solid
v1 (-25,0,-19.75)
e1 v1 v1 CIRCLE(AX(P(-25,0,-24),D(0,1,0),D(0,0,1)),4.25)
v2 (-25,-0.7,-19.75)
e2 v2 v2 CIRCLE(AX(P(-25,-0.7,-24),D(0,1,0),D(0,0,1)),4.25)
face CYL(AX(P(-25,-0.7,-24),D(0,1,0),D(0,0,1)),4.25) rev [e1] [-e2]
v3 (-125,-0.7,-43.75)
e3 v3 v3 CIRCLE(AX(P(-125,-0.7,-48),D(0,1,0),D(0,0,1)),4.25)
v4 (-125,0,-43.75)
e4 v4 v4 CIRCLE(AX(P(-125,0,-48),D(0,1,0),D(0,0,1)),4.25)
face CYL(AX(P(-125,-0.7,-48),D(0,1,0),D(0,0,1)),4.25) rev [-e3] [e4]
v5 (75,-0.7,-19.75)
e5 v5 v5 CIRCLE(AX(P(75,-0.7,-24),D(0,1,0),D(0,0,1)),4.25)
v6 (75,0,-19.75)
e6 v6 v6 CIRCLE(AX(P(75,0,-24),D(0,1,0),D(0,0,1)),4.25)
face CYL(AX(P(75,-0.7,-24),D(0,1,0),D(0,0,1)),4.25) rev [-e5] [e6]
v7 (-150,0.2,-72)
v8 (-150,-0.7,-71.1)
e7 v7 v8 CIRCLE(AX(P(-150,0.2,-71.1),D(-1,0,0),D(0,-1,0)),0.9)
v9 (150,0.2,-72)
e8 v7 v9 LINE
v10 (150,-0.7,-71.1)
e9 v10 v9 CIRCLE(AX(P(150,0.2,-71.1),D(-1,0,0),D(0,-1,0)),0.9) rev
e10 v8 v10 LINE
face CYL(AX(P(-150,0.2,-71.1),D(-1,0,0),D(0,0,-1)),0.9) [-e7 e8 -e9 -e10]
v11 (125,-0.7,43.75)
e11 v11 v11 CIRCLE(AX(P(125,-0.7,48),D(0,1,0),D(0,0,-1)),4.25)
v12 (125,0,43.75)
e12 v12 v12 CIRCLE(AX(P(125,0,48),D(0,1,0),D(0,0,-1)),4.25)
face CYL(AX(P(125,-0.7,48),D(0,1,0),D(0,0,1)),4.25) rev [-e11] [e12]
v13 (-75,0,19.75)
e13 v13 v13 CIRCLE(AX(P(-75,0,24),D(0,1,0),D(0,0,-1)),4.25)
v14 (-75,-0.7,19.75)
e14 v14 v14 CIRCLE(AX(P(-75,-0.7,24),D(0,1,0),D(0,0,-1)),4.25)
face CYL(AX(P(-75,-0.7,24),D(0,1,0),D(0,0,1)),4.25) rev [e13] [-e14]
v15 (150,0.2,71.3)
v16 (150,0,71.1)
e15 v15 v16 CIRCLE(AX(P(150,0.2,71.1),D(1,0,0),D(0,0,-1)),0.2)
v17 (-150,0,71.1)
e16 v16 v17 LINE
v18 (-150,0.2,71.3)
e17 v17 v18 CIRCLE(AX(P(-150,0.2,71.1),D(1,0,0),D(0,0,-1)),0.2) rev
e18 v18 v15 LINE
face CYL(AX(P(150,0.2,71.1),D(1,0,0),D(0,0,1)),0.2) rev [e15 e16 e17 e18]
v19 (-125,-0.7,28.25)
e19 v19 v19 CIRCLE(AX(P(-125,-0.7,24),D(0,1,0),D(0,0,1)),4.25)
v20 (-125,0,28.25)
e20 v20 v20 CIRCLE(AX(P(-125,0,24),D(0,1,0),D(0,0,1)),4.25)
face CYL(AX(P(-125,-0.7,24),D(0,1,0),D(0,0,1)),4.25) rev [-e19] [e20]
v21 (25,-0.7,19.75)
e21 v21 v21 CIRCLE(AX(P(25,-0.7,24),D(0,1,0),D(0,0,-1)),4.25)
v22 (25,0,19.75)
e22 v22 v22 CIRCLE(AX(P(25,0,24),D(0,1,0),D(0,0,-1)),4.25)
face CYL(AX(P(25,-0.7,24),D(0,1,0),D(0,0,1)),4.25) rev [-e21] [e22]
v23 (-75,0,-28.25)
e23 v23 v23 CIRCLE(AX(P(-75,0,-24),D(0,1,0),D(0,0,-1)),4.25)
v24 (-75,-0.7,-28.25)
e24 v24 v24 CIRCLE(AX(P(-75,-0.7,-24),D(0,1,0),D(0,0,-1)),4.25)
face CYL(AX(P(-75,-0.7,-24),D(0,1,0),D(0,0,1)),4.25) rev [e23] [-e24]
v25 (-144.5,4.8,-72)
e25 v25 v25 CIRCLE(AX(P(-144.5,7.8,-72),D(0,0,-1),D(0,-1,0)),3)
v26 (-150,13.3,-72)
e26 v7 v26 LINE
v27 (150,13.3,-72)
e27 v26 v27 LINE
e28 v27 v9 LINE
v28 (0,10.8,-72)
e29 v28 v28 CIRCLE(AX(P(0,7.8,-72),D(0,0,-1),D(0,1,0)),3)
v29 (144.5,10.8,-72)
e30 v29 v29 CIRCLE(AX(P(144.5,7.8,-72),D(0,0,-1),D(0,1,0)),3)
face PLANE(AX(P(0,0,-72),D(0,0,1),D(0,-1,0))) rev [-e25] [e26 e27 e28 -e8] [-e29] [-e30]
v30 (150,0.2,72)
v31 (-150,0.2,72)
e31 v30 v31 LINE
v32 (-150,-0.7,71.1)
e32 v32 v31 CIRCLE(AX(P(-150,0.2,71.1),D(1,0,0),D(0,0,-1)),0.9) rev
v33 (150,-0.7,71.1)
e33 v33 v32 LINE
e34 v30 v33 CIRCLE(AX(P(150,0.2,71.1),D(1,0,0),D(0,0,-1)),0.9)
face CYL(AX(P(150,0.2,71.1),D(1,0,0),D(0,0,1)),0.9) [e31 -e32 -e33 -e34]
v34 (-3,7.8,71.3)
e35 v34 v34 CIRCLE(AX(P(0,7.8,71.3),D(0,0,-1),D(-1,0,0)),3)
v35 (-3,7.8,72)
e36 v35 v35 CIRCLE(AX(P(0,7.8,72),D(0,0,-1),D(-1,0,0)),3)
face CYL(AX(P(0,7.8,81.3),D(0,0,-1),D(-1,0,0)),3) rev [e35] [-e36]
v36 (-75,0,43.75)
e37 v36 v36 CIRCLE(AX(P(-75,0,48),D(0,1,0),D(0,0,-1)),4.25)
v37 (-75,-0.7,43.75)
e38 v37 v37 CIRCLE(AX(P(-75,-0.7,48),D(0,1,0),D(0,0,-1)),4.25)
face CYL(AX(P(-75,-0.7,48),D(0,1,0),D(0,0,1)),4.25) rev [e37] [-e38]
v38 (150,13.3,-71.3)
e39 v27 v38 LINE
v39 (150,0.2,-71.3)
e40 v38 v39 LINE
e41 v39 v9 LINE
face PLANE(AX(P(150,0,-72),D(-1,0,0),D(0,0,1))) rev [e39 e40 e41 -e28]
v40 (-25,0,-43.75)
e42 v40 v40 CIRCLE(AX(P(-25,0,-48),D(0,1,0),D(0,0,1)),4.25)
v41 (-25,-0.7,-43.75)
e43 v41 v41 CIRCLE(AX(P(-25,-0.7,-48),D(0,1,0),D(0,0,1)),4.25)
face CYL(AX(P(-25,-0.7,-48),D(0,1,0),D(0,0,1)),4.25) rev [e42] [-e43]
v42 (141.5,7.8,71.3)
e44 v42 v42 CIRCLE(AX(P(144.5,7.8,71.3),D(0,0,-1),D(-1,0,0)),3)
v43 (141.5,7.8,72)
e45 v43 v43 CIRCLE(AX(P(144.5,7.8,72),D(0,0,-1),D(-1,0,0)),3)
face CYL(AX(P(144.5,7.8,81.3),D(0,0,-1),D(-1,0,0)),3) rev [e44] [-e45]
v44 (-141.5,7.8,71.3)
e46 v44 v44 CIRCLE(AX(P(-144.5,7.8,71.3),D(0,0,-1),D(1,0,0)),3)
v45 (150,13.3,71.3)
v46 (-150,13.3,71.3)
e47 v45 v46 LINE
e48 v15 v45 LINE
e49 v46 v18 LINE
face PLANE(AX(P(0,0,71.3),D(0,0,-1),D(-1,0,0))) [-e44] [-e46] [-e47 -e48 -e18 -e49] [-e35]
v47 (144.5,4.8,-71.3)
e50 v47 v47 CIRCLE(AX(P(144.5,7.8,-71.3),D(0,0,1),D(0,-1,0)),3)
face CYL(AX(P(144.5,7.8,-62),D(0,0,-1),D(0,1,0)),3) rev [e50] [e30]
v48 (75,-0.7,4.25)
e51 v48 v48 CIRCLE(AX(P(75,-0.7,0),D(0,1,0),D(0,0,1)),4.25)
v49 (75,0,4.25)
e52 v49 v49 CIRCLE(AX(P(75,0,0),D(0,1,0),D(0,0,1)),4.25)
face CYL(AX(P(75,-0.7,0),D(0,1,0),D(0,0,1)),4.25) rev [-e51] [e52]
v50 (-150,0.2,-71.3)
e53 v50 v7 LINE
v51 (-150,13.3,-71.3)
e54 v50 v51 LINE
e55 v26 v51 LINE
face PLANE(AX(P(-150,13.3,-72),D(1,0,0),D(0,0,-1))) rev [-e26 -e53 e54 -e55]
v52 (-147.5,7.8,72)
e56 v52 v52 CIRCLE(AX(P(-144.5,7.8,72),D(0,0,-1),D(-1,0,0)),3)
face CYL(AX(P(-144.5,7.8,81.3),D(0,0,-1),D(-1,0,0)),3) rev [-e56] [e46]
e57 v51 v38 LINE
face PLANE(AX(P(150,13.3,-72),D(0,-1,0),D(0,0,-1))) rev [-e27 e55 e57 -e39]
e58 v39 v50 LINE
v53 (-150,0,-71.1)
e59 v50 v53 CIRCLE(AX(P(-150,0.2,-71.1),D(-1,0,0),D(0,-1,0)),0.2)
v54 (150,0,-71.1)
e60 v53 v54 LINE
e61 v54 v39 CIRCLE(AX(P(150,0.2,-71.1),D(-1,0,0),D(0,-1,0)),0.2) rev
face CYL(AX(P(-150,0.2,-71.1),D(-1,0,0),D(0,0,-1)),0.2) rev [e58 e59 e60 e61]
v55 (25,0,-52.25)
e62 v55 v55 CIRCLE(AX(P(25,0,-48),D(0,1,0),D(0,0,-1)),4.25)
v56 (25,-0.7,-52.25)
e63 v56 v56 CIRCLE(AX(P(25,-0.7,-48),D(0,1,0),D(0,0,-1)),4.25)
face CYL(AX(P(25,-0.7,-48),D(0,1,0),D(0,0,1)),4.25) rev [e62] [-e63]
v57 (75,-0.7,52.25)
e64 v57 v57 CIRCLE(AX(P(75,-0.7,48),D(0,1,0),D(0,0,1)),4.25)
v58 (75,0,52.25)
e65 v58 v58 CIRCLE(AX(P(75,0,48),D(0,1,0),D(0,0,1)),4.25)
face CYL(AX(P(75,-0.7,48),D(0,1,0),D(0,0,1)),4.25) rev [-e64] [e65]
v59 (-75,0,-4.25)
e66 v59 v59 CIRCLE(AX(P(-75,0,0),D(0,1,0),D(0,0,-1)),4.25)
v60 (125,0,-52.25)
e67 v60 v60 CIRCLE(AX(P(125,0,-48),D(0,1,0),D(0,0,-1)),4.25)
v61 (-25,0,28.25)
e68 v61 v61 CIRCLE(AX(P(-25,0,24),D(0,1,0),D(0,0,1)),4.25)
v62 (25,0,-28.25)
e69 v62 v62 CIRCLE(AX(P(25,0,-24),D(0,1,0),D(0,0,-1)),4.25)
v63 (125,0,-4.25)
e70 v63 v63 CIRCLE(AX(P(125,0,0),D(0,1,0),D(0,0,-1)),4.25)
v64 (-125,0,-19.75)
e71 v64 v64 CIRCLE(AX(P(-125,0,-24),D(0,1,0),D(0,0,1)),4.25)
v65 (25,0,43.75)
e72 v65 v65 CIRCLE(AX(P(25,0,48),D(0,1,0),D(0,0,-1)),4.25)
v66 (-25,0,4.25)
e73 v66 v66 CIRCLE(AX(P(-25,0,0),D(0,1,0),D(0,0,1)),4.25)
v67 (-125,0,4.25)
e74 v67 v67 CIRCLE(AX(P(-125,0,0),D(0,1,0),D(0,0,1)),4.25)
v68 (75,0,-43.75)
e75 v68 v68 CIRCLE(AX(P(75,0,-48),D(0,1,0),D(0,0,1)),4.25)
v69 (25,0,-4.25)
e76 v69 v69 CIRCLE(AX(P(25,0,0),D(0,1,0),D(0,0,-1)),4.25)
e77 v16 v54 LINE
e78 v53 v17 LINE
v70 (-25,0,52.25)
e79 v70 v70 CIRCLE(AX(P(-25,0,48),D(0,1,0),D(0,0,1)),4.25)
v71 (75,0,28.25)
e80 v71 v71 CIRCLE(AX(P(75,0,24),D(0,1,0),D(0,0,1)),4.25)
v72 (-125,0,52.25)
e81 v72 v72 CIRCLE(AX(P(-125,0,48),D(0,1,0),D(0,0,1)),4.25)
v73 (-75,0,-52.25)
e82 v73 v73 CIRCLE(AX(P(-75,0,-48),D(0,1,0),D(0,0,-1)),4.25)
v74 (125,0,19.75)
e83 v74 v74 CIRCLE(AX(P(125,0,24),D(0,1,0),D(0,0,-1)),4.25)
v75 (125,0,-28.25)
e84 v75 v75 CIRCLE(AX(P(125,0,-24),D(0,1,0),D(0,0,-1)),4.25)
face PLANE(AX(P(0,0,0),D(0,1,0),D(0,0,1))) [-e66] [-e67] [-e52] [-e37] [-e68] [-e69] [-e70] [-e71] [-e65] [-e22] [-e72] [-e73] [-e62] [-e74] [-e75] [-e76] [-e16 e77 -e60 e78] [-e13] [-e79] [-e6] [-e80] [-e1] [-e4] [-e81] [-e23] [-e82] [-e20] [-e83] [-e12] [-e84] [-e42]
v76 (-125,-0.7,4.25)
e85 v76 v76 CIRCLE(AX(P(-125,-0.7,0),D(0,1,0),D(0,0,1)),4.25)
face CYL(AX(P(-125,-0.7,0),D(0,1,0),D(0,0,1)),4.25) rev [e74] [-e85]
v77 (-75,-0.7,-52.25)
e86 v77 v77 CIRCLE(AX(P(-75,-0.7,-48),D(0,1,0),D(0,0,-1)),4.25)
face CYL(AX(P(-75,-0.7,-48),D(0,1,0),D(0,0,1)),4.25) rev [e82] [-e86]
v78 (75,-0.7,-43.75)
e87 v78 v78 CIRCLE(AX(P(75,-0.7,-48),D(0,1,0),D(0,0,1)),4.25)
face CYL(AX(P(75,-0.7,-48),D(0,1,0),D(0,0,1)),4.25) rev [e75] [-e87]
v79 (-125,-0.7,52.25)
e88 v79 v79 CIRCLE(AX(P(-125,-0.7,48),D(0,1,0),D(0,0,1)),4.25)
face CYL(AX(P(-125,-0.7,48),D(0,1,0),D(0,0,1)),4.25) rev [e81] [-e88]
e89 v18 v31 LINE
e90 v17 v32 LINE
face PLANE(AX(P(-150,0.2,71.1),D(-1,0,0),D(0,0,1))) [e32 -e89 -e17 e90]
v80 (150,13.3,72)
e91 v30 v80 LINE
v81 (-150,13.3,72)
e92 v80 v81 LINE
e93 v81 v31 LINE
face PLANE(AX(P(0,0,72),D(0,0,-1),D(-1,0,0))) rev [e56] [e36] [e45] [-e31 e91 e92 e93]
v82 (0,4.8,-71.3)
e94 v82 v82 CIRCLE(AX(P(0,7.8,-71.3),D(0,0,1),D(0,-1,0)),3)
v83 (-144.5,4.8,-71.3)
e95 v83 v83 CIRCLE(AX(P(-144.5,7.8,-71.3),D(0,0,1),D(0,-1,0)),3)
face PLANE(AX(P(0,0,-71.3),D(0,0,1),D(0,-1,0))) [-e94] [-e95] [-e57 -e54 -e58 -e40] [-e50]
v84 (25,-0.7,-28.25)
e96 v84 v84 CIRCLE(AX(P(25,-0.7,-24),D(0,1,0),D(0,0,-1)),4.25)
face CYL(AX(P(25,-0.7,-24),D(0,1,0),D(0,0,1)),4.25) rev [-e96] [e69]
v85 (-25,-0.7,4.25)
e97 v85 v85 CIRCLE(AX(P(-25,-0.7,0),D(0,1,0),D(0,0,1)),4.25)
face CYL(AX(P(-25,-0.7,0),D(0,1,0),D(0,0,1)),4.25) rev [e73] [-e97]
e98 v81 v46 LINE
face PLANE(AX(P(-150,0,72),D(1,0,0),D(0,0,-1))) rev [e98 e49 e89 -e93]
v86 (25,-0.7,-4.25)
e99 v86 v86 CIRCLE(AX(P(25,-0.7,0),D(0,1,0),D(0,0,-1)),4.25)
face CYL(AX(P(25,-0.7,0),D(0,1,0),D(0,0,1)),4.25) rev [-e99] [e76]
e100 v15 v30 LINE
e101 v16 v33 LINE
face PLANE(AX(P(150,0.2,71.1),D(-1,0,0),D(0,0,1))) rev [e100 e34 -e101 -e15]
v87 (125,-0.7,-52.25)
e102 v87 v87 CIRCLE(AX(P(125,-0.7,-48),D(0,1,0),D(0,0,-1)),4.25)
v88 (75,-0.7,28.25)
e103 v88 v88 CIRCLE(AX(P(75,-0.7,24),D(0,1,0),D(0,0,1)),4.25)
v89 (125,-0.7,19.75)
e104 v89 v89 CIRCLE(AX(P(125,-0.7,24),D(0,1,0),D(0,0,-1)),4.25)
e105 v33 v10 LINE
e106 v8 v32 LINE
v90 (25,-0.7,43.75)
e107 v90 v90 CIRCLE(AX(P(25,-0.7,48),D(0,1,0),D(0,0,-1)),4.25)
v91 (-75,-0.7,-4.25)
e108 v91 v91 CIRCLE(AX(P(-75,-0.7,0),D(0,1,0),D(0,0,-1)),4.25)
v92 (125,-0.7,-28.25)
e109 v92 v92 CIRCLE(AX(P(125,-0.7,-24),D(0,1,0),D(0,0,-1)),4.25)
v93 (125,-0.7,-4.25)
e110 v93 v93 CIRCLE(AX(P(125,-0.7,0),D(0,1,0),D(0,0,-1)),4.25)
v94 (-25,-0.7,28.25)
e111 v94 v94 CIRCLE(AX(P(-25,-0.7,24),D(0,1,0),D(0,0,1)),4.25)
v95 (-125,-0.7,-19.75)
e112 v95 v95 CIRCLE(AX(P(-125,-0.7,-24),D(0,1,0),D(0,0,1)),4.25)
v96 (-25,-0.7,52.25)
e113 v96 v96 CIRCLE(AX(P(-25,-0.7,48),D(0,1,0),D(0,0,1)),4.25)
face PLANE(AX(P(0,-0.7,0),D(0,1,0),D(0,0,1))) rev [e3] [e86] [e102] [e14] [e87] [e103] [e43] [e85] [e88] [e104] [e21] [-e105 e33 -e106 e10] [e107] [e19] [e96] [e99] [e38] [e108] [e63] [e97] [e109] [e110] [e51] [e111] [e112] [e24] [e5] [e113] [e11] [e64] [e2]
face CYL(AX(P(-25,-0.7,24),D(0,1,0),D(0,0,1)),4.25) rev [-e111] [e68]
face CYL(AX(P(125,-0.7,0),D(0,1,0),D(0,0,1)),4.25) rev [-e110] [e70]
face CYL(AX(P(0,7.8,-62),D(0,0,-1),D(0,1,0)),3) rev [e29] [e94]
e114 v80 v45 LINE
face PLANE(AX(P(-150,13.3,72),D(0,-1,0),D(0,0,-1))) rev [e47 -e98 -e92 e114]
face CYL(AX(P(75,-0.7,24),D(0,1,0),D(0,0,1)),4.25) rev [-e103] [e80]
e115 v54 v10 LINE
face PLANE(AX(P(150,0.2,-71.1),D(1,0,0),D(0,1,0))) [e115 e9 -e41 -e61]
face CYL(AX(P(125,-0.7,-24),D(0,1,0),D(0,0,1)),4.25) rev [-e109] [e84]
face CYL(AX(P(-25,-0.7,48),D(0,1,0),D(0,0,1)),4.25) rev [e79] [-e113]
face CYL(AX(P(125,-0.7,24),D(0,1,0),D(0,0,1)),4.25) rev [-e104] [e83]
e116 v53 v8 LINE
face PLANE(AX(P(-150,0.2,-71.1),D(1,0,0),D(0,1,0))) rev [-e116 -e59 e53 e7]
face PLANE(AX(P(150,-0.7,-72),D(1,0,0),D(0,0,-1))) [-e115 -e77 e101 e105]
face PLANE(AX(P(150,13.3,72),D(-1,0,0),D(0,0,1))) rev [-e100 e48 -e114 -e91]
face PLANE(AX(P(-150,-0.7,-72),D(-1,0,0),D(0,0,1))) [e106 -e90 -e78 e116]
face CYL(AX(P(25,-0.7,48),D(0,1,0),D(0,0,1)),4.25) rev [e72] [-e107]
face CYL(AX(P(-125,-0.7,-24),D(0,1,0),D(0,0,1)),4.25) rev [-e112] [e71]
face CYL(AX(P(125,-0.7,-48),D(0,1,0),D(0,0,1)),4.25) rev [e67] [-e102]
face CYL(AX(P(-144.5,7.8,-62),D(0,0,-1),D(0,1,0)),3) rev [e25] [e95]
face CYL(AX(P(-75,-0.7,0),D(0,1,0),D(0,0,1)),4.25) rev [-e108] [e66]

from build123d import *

# Parameters (mm, degrees)
SKETCH_1_W                         = 300
SKETCH_1_H                         = 144
SKETCH_1_R                         = 4.25
SM_BASE_FLANGE_1_DEPTH             = 0.7
SM_EDGE_FLANGE_1_STRIP_W           = 3.2
SM_EDGE_FLANGE_1_STRIP_H           = 0.7
SM_EDGE_FLANGE_1_STRIP_CUT_DEPTH   = 300
SM_EDGE_FLANGE_1_STRIP_2_W         = 3.2
SM_EDGE_FLANGE_1_STRIP_2_H         = 0.7
SM_EDGE_FLANGE_1_STRIP_CUT_2_DEPTH = 300
SM_EDGE_FLANGE_1_DEPTH             = 300
SM_EDGE_FLANGE_1_BEND_DEPTH        = 300
SKETCH_14_R                        = 3
CUT_EXTRUDE_1_DEPTH                = 10
SKETCH_15_R                        = 3
CUT_EXTRUDE_2_DEPTH                = 10


# Sheet-metal steps are written as plain solids
with BuildPart() as part:
    # Sketch 1 → 基体-法兰1 (new body)
    with BuildSketch(Plane(origin=(0, 0, 0), x_dir=(1, 0, 0), z_dir=(0, 1, 0))):
        Rectangle(SKETCH_1_W, SKETCH_1_H)
        with Locations(Location((-125, -48, 0), (0, 0, 270))):
            Circle(SKETCH_1_R, mode=Mode.SUBTRACT)
        with Locations(Location((-125, -24, 0), (0, 0, 270))):
            Circle(SKETCH_1_R, mode=Mode.SUBTRACT)
        with Locations(Location((-125, 0, 0), (0, 0, 270))):
            Circle(SKETCH_1_R, mode=Mode.SUBTRACT)
        with Locations(Location((-125, 24, 0), (0, 0, 270))):
            Circle(SKETCH_1_R, mode=Mode.SUBTRACT)
        with Locations(Location((-125, 48, 0), (0, 0, 270))):
            Circle(SKETCH_1_R, mode=Mode.SUBTRACT)
        with Locations(Location((-75, -48, 0), (0, 0, 90))):
            Circle(SKETCH_1_R, mode=Mode.SUBTRACT)
        with Locations(Location((-75, -24, 0), (0, 0, 90))):
            Circle(SKETCH_1_R, mode=Mode.SUBTRACT)
        with Locations(Location((-75, 0, 0), (0, 0, 90))):
            Circle(SKETCH_1_R, mode=Mode.SUBTRACT)
        with Locations(Location((-75, 24, 0), (0, 0, 90))):
            Circle(SKETCH_1_R, mode=Mode.SUBTRACT)
        with Locations(Location((-75, 48, 0), (0, 0, 90))):
            Circle(SKETCH_1_R, mode=Mode.SUBTRACT)
        with Locations(Location((-25, -48, 0), (0, 0, 270))):
            Circle(SKETCH_1_R, mode=Mode.SUBTRACT)
        with Locations(Location((-25, -24, 0), (0, 0, 270))):
            Circle(SKETCH_1_R, mode=Mode.SUBTRACT)
        with Locations(Location((-25, 0, 0), (0, 0, 270))):
            Circle(SKETCH_1_R, mode=Mode.SUBTRACT)
        with Locations(Location((-25, 24, 0), (0, 0, 270))):
            Circle(SKETCH_1_R, mode=Mode.SUBTRACT)
        with Locations(Location((-25, 48, 0), (0, 0, 270))):
            Circle(SKETCH_1_R, mode=Mode.SUBTRACT)
        with Locations(Location((25, -48, 0), (0, 0, 90))):
            Circle(SKETCH_1_R, mode=Mode.SUBTRACT)
        with Locations(Location((25, -24, 0), (0, 0, 90))):
            Circle(SKETCH_1_R, mode=Mode.SUBTRACT)
        with Locations(Location((25, 0, 0), (0, 0, 90))):
            Circle(SKETCH_1_R, mode=Mode.SUBTRACT)
        with Locations(Location((25, 24, 0), (0, 0, 90))):
            Circle(SKETCH_1_R, mode=Mode.SUBTRACT)
        with Locations(Location((25, 48, 0), (0, 0, 90))):
            Circle(SKETCH_1_R, mode=Mode.SUBTRACT)
        with Locations(Location((75, 48, 0), (0, 0, 270))):
            Circle(SKETCH_1_R, mode=Mode.SUBTRACT)
        with Locations(Location((75, 24, 0), (0, 0, 270))):
            Circle(SKETCH_1_R, mode=Mode.SUBTRACT)
        with Locations(Location((75, 0, 0), (0, 0, 270))):
            Circle(SKETCH_1_R, mode=Mode.SUBTRACT)
        with Locations(Location((75, -24, 0), (0, 0, 270))):
            Circle(SKETCH_1_R, mode=Mode.SUBTRACT)
        with Locations(Location((75, -48, 0), (0, 0, 270))):
            Circle(SKETCH_1_R, mode=Mode.SUBTRACT)
        with Locations(Location((125, -48, 0), (0, 0, 90))):
            Circle(SKETCH_1_R, mode=Mode.SUBTRACT)
        with Locations(Location((125, -24, 0), (0, 0, 90))):
            Circle(SKETCH_1_R, mode=Mode.SUBTRACT)
        with Locations(Location((125, 0, 0), (0, 0, 90))):
            Circle(SKETCH_1_R, mode=Mode.SUBTRACT)
        with Locations(Location((125, 24, 0), (0, 0, 90))):
            Circle(SKETCH_1_R, mode=Mode.SUBTRACT)
        with Locations(Location((125, 48, 0), (0, 0, 90))):
            Circle(SKETCH_1_R, mode=Mode.SUBTRACT)
    extrude(amount=-SM_BASE_FLANGE_1_DEPTH)

    # 边线-法兰1 strip (across the edge) → 边线-法兰1 strip cut (cut)
    with BuildSketch(Plane(origin=(-150, 0, 72), x_dir=(0, 0, -1), z_dir=(1, 0, 0))):
        with Locations((-0.7, -0.35)):
            Rectangle(SM_EDGE_FLANGE_1_STRIP_W, SM_EDGE_FLANGE_1_STRIP_H)
    extrude(amount=SM_EDGE_FLANGE_1_STRIP_CUT_DEPTH, mode=Mode.SUBTRACT)

    # 边线-法兰1 strip 2 (across the edge) → 边线-法兰1 strip cut 2 (cut)
    with BuildSketch(Plane(origin=(150, 0, -72), x_dir=(0, 0, 1), z_dir=(-1, 0, 0))):
        with Locations((-0.7, -0.35)):
            Rectangle(SM_EDGE_FLANGE_1_STRIP_2_W, SM_EDGE_FLANGE_1_STRIP_2_H)
    extrude(amount=SM_EDGE_FLANGE_1_STRIP_CUT_2_DEPTH, mode=Mode.SUBTRACT)

    # 边线-法兰1 section (across the edge) → 边线-法兰1 (add)
    with BuildSketch(Plane(origin=(-150, 0, 72), x_dir=(0, 0, -1), z_dir=(1, 0, 0))):
        with BuildLine():
            Line((0, 0.2), (0, 13.3))
            Line((0, 13.3), (0.7, 13.3))
            Line((0.7, 13.3), (0.7, 0.2))
            ThreePointArc((0.7, 0.2), (0.758578644, 0.058578644), (0.9, 0))
            Line((0.9, 0), (0.9, -0.7))
            ThreePointArc((0.9, -0.7), (0.263603897, -0.436396103), (0, 0.2))
        make_face()
    extrude(amount=SM_EDGE_FLANGE_1_DEPTH)

    # 边线-法兰1 section 2 (across the edge) → 边线-法兰1 bend (add)
    with BuildSketch(Plane(origin=(150, 0, -72), x_dir=(0, 0, 1), z_dir=(-1, 0, 0))):
        with BuildLine():
            Line((0, 0.2), (0, 13.3))
            Line((0, 13.3), (0.7, 13.3))
            Line((0.7, 13.3), (0.7, 0.2))
            ThreePointArc((0.7, 0.2), (0.758578644, 0.058578644), (0.9, 0))
            Line((0.9, 0), (0.9, -0.7))
            ThreePointArc((0.9, -0.7), (0.263603897, -0.436396103), (0, 0.2))
        make_face()
    extrude(amount=SM_EDGE_FLANGE_1_BEND_DEPTH)

    # 草图14 → 切除-拉伸1 (cut)
    with BuildSketch(Plane(origin=(0, 0, 71.3), x_dir=(-1, 0, 0), z_dir=(0, 0, -1))):
        with Locations((-144.5, 7.8)):
            Circle(SKETCH_14_R)
        with Locations((0, 7.8)):
            Circle(SKETCH_14_R)
        with Locations((144.5, 7.8)):
            Circle(SKETCH_14_R)
    extrude(amount=-CUT_EXTRUDE_1_DEPTH, mode=Mode.SUBTRACT)

    # 草图15 → 切除-拉伸2 (cut)
    with BuildSketch(Plane(origin=(0, 0, -72), x_dir=(-1, 0, 0), z_dir=(0, 0, -1))):
        with Locations((-144.5, 7.8)):
            Circle(SKETCH_15_R)
        with Locations((0, 7.8)):
            Circle(SKETCH_15_R)
        with Locations((144.5, 7.8)):
            Circle(SKETCH_15_R)
    extrude(amount=-CUT_EXTRUDE_2_DEPTH, mode=Mode.SUBTRACT)


solid = part.part
